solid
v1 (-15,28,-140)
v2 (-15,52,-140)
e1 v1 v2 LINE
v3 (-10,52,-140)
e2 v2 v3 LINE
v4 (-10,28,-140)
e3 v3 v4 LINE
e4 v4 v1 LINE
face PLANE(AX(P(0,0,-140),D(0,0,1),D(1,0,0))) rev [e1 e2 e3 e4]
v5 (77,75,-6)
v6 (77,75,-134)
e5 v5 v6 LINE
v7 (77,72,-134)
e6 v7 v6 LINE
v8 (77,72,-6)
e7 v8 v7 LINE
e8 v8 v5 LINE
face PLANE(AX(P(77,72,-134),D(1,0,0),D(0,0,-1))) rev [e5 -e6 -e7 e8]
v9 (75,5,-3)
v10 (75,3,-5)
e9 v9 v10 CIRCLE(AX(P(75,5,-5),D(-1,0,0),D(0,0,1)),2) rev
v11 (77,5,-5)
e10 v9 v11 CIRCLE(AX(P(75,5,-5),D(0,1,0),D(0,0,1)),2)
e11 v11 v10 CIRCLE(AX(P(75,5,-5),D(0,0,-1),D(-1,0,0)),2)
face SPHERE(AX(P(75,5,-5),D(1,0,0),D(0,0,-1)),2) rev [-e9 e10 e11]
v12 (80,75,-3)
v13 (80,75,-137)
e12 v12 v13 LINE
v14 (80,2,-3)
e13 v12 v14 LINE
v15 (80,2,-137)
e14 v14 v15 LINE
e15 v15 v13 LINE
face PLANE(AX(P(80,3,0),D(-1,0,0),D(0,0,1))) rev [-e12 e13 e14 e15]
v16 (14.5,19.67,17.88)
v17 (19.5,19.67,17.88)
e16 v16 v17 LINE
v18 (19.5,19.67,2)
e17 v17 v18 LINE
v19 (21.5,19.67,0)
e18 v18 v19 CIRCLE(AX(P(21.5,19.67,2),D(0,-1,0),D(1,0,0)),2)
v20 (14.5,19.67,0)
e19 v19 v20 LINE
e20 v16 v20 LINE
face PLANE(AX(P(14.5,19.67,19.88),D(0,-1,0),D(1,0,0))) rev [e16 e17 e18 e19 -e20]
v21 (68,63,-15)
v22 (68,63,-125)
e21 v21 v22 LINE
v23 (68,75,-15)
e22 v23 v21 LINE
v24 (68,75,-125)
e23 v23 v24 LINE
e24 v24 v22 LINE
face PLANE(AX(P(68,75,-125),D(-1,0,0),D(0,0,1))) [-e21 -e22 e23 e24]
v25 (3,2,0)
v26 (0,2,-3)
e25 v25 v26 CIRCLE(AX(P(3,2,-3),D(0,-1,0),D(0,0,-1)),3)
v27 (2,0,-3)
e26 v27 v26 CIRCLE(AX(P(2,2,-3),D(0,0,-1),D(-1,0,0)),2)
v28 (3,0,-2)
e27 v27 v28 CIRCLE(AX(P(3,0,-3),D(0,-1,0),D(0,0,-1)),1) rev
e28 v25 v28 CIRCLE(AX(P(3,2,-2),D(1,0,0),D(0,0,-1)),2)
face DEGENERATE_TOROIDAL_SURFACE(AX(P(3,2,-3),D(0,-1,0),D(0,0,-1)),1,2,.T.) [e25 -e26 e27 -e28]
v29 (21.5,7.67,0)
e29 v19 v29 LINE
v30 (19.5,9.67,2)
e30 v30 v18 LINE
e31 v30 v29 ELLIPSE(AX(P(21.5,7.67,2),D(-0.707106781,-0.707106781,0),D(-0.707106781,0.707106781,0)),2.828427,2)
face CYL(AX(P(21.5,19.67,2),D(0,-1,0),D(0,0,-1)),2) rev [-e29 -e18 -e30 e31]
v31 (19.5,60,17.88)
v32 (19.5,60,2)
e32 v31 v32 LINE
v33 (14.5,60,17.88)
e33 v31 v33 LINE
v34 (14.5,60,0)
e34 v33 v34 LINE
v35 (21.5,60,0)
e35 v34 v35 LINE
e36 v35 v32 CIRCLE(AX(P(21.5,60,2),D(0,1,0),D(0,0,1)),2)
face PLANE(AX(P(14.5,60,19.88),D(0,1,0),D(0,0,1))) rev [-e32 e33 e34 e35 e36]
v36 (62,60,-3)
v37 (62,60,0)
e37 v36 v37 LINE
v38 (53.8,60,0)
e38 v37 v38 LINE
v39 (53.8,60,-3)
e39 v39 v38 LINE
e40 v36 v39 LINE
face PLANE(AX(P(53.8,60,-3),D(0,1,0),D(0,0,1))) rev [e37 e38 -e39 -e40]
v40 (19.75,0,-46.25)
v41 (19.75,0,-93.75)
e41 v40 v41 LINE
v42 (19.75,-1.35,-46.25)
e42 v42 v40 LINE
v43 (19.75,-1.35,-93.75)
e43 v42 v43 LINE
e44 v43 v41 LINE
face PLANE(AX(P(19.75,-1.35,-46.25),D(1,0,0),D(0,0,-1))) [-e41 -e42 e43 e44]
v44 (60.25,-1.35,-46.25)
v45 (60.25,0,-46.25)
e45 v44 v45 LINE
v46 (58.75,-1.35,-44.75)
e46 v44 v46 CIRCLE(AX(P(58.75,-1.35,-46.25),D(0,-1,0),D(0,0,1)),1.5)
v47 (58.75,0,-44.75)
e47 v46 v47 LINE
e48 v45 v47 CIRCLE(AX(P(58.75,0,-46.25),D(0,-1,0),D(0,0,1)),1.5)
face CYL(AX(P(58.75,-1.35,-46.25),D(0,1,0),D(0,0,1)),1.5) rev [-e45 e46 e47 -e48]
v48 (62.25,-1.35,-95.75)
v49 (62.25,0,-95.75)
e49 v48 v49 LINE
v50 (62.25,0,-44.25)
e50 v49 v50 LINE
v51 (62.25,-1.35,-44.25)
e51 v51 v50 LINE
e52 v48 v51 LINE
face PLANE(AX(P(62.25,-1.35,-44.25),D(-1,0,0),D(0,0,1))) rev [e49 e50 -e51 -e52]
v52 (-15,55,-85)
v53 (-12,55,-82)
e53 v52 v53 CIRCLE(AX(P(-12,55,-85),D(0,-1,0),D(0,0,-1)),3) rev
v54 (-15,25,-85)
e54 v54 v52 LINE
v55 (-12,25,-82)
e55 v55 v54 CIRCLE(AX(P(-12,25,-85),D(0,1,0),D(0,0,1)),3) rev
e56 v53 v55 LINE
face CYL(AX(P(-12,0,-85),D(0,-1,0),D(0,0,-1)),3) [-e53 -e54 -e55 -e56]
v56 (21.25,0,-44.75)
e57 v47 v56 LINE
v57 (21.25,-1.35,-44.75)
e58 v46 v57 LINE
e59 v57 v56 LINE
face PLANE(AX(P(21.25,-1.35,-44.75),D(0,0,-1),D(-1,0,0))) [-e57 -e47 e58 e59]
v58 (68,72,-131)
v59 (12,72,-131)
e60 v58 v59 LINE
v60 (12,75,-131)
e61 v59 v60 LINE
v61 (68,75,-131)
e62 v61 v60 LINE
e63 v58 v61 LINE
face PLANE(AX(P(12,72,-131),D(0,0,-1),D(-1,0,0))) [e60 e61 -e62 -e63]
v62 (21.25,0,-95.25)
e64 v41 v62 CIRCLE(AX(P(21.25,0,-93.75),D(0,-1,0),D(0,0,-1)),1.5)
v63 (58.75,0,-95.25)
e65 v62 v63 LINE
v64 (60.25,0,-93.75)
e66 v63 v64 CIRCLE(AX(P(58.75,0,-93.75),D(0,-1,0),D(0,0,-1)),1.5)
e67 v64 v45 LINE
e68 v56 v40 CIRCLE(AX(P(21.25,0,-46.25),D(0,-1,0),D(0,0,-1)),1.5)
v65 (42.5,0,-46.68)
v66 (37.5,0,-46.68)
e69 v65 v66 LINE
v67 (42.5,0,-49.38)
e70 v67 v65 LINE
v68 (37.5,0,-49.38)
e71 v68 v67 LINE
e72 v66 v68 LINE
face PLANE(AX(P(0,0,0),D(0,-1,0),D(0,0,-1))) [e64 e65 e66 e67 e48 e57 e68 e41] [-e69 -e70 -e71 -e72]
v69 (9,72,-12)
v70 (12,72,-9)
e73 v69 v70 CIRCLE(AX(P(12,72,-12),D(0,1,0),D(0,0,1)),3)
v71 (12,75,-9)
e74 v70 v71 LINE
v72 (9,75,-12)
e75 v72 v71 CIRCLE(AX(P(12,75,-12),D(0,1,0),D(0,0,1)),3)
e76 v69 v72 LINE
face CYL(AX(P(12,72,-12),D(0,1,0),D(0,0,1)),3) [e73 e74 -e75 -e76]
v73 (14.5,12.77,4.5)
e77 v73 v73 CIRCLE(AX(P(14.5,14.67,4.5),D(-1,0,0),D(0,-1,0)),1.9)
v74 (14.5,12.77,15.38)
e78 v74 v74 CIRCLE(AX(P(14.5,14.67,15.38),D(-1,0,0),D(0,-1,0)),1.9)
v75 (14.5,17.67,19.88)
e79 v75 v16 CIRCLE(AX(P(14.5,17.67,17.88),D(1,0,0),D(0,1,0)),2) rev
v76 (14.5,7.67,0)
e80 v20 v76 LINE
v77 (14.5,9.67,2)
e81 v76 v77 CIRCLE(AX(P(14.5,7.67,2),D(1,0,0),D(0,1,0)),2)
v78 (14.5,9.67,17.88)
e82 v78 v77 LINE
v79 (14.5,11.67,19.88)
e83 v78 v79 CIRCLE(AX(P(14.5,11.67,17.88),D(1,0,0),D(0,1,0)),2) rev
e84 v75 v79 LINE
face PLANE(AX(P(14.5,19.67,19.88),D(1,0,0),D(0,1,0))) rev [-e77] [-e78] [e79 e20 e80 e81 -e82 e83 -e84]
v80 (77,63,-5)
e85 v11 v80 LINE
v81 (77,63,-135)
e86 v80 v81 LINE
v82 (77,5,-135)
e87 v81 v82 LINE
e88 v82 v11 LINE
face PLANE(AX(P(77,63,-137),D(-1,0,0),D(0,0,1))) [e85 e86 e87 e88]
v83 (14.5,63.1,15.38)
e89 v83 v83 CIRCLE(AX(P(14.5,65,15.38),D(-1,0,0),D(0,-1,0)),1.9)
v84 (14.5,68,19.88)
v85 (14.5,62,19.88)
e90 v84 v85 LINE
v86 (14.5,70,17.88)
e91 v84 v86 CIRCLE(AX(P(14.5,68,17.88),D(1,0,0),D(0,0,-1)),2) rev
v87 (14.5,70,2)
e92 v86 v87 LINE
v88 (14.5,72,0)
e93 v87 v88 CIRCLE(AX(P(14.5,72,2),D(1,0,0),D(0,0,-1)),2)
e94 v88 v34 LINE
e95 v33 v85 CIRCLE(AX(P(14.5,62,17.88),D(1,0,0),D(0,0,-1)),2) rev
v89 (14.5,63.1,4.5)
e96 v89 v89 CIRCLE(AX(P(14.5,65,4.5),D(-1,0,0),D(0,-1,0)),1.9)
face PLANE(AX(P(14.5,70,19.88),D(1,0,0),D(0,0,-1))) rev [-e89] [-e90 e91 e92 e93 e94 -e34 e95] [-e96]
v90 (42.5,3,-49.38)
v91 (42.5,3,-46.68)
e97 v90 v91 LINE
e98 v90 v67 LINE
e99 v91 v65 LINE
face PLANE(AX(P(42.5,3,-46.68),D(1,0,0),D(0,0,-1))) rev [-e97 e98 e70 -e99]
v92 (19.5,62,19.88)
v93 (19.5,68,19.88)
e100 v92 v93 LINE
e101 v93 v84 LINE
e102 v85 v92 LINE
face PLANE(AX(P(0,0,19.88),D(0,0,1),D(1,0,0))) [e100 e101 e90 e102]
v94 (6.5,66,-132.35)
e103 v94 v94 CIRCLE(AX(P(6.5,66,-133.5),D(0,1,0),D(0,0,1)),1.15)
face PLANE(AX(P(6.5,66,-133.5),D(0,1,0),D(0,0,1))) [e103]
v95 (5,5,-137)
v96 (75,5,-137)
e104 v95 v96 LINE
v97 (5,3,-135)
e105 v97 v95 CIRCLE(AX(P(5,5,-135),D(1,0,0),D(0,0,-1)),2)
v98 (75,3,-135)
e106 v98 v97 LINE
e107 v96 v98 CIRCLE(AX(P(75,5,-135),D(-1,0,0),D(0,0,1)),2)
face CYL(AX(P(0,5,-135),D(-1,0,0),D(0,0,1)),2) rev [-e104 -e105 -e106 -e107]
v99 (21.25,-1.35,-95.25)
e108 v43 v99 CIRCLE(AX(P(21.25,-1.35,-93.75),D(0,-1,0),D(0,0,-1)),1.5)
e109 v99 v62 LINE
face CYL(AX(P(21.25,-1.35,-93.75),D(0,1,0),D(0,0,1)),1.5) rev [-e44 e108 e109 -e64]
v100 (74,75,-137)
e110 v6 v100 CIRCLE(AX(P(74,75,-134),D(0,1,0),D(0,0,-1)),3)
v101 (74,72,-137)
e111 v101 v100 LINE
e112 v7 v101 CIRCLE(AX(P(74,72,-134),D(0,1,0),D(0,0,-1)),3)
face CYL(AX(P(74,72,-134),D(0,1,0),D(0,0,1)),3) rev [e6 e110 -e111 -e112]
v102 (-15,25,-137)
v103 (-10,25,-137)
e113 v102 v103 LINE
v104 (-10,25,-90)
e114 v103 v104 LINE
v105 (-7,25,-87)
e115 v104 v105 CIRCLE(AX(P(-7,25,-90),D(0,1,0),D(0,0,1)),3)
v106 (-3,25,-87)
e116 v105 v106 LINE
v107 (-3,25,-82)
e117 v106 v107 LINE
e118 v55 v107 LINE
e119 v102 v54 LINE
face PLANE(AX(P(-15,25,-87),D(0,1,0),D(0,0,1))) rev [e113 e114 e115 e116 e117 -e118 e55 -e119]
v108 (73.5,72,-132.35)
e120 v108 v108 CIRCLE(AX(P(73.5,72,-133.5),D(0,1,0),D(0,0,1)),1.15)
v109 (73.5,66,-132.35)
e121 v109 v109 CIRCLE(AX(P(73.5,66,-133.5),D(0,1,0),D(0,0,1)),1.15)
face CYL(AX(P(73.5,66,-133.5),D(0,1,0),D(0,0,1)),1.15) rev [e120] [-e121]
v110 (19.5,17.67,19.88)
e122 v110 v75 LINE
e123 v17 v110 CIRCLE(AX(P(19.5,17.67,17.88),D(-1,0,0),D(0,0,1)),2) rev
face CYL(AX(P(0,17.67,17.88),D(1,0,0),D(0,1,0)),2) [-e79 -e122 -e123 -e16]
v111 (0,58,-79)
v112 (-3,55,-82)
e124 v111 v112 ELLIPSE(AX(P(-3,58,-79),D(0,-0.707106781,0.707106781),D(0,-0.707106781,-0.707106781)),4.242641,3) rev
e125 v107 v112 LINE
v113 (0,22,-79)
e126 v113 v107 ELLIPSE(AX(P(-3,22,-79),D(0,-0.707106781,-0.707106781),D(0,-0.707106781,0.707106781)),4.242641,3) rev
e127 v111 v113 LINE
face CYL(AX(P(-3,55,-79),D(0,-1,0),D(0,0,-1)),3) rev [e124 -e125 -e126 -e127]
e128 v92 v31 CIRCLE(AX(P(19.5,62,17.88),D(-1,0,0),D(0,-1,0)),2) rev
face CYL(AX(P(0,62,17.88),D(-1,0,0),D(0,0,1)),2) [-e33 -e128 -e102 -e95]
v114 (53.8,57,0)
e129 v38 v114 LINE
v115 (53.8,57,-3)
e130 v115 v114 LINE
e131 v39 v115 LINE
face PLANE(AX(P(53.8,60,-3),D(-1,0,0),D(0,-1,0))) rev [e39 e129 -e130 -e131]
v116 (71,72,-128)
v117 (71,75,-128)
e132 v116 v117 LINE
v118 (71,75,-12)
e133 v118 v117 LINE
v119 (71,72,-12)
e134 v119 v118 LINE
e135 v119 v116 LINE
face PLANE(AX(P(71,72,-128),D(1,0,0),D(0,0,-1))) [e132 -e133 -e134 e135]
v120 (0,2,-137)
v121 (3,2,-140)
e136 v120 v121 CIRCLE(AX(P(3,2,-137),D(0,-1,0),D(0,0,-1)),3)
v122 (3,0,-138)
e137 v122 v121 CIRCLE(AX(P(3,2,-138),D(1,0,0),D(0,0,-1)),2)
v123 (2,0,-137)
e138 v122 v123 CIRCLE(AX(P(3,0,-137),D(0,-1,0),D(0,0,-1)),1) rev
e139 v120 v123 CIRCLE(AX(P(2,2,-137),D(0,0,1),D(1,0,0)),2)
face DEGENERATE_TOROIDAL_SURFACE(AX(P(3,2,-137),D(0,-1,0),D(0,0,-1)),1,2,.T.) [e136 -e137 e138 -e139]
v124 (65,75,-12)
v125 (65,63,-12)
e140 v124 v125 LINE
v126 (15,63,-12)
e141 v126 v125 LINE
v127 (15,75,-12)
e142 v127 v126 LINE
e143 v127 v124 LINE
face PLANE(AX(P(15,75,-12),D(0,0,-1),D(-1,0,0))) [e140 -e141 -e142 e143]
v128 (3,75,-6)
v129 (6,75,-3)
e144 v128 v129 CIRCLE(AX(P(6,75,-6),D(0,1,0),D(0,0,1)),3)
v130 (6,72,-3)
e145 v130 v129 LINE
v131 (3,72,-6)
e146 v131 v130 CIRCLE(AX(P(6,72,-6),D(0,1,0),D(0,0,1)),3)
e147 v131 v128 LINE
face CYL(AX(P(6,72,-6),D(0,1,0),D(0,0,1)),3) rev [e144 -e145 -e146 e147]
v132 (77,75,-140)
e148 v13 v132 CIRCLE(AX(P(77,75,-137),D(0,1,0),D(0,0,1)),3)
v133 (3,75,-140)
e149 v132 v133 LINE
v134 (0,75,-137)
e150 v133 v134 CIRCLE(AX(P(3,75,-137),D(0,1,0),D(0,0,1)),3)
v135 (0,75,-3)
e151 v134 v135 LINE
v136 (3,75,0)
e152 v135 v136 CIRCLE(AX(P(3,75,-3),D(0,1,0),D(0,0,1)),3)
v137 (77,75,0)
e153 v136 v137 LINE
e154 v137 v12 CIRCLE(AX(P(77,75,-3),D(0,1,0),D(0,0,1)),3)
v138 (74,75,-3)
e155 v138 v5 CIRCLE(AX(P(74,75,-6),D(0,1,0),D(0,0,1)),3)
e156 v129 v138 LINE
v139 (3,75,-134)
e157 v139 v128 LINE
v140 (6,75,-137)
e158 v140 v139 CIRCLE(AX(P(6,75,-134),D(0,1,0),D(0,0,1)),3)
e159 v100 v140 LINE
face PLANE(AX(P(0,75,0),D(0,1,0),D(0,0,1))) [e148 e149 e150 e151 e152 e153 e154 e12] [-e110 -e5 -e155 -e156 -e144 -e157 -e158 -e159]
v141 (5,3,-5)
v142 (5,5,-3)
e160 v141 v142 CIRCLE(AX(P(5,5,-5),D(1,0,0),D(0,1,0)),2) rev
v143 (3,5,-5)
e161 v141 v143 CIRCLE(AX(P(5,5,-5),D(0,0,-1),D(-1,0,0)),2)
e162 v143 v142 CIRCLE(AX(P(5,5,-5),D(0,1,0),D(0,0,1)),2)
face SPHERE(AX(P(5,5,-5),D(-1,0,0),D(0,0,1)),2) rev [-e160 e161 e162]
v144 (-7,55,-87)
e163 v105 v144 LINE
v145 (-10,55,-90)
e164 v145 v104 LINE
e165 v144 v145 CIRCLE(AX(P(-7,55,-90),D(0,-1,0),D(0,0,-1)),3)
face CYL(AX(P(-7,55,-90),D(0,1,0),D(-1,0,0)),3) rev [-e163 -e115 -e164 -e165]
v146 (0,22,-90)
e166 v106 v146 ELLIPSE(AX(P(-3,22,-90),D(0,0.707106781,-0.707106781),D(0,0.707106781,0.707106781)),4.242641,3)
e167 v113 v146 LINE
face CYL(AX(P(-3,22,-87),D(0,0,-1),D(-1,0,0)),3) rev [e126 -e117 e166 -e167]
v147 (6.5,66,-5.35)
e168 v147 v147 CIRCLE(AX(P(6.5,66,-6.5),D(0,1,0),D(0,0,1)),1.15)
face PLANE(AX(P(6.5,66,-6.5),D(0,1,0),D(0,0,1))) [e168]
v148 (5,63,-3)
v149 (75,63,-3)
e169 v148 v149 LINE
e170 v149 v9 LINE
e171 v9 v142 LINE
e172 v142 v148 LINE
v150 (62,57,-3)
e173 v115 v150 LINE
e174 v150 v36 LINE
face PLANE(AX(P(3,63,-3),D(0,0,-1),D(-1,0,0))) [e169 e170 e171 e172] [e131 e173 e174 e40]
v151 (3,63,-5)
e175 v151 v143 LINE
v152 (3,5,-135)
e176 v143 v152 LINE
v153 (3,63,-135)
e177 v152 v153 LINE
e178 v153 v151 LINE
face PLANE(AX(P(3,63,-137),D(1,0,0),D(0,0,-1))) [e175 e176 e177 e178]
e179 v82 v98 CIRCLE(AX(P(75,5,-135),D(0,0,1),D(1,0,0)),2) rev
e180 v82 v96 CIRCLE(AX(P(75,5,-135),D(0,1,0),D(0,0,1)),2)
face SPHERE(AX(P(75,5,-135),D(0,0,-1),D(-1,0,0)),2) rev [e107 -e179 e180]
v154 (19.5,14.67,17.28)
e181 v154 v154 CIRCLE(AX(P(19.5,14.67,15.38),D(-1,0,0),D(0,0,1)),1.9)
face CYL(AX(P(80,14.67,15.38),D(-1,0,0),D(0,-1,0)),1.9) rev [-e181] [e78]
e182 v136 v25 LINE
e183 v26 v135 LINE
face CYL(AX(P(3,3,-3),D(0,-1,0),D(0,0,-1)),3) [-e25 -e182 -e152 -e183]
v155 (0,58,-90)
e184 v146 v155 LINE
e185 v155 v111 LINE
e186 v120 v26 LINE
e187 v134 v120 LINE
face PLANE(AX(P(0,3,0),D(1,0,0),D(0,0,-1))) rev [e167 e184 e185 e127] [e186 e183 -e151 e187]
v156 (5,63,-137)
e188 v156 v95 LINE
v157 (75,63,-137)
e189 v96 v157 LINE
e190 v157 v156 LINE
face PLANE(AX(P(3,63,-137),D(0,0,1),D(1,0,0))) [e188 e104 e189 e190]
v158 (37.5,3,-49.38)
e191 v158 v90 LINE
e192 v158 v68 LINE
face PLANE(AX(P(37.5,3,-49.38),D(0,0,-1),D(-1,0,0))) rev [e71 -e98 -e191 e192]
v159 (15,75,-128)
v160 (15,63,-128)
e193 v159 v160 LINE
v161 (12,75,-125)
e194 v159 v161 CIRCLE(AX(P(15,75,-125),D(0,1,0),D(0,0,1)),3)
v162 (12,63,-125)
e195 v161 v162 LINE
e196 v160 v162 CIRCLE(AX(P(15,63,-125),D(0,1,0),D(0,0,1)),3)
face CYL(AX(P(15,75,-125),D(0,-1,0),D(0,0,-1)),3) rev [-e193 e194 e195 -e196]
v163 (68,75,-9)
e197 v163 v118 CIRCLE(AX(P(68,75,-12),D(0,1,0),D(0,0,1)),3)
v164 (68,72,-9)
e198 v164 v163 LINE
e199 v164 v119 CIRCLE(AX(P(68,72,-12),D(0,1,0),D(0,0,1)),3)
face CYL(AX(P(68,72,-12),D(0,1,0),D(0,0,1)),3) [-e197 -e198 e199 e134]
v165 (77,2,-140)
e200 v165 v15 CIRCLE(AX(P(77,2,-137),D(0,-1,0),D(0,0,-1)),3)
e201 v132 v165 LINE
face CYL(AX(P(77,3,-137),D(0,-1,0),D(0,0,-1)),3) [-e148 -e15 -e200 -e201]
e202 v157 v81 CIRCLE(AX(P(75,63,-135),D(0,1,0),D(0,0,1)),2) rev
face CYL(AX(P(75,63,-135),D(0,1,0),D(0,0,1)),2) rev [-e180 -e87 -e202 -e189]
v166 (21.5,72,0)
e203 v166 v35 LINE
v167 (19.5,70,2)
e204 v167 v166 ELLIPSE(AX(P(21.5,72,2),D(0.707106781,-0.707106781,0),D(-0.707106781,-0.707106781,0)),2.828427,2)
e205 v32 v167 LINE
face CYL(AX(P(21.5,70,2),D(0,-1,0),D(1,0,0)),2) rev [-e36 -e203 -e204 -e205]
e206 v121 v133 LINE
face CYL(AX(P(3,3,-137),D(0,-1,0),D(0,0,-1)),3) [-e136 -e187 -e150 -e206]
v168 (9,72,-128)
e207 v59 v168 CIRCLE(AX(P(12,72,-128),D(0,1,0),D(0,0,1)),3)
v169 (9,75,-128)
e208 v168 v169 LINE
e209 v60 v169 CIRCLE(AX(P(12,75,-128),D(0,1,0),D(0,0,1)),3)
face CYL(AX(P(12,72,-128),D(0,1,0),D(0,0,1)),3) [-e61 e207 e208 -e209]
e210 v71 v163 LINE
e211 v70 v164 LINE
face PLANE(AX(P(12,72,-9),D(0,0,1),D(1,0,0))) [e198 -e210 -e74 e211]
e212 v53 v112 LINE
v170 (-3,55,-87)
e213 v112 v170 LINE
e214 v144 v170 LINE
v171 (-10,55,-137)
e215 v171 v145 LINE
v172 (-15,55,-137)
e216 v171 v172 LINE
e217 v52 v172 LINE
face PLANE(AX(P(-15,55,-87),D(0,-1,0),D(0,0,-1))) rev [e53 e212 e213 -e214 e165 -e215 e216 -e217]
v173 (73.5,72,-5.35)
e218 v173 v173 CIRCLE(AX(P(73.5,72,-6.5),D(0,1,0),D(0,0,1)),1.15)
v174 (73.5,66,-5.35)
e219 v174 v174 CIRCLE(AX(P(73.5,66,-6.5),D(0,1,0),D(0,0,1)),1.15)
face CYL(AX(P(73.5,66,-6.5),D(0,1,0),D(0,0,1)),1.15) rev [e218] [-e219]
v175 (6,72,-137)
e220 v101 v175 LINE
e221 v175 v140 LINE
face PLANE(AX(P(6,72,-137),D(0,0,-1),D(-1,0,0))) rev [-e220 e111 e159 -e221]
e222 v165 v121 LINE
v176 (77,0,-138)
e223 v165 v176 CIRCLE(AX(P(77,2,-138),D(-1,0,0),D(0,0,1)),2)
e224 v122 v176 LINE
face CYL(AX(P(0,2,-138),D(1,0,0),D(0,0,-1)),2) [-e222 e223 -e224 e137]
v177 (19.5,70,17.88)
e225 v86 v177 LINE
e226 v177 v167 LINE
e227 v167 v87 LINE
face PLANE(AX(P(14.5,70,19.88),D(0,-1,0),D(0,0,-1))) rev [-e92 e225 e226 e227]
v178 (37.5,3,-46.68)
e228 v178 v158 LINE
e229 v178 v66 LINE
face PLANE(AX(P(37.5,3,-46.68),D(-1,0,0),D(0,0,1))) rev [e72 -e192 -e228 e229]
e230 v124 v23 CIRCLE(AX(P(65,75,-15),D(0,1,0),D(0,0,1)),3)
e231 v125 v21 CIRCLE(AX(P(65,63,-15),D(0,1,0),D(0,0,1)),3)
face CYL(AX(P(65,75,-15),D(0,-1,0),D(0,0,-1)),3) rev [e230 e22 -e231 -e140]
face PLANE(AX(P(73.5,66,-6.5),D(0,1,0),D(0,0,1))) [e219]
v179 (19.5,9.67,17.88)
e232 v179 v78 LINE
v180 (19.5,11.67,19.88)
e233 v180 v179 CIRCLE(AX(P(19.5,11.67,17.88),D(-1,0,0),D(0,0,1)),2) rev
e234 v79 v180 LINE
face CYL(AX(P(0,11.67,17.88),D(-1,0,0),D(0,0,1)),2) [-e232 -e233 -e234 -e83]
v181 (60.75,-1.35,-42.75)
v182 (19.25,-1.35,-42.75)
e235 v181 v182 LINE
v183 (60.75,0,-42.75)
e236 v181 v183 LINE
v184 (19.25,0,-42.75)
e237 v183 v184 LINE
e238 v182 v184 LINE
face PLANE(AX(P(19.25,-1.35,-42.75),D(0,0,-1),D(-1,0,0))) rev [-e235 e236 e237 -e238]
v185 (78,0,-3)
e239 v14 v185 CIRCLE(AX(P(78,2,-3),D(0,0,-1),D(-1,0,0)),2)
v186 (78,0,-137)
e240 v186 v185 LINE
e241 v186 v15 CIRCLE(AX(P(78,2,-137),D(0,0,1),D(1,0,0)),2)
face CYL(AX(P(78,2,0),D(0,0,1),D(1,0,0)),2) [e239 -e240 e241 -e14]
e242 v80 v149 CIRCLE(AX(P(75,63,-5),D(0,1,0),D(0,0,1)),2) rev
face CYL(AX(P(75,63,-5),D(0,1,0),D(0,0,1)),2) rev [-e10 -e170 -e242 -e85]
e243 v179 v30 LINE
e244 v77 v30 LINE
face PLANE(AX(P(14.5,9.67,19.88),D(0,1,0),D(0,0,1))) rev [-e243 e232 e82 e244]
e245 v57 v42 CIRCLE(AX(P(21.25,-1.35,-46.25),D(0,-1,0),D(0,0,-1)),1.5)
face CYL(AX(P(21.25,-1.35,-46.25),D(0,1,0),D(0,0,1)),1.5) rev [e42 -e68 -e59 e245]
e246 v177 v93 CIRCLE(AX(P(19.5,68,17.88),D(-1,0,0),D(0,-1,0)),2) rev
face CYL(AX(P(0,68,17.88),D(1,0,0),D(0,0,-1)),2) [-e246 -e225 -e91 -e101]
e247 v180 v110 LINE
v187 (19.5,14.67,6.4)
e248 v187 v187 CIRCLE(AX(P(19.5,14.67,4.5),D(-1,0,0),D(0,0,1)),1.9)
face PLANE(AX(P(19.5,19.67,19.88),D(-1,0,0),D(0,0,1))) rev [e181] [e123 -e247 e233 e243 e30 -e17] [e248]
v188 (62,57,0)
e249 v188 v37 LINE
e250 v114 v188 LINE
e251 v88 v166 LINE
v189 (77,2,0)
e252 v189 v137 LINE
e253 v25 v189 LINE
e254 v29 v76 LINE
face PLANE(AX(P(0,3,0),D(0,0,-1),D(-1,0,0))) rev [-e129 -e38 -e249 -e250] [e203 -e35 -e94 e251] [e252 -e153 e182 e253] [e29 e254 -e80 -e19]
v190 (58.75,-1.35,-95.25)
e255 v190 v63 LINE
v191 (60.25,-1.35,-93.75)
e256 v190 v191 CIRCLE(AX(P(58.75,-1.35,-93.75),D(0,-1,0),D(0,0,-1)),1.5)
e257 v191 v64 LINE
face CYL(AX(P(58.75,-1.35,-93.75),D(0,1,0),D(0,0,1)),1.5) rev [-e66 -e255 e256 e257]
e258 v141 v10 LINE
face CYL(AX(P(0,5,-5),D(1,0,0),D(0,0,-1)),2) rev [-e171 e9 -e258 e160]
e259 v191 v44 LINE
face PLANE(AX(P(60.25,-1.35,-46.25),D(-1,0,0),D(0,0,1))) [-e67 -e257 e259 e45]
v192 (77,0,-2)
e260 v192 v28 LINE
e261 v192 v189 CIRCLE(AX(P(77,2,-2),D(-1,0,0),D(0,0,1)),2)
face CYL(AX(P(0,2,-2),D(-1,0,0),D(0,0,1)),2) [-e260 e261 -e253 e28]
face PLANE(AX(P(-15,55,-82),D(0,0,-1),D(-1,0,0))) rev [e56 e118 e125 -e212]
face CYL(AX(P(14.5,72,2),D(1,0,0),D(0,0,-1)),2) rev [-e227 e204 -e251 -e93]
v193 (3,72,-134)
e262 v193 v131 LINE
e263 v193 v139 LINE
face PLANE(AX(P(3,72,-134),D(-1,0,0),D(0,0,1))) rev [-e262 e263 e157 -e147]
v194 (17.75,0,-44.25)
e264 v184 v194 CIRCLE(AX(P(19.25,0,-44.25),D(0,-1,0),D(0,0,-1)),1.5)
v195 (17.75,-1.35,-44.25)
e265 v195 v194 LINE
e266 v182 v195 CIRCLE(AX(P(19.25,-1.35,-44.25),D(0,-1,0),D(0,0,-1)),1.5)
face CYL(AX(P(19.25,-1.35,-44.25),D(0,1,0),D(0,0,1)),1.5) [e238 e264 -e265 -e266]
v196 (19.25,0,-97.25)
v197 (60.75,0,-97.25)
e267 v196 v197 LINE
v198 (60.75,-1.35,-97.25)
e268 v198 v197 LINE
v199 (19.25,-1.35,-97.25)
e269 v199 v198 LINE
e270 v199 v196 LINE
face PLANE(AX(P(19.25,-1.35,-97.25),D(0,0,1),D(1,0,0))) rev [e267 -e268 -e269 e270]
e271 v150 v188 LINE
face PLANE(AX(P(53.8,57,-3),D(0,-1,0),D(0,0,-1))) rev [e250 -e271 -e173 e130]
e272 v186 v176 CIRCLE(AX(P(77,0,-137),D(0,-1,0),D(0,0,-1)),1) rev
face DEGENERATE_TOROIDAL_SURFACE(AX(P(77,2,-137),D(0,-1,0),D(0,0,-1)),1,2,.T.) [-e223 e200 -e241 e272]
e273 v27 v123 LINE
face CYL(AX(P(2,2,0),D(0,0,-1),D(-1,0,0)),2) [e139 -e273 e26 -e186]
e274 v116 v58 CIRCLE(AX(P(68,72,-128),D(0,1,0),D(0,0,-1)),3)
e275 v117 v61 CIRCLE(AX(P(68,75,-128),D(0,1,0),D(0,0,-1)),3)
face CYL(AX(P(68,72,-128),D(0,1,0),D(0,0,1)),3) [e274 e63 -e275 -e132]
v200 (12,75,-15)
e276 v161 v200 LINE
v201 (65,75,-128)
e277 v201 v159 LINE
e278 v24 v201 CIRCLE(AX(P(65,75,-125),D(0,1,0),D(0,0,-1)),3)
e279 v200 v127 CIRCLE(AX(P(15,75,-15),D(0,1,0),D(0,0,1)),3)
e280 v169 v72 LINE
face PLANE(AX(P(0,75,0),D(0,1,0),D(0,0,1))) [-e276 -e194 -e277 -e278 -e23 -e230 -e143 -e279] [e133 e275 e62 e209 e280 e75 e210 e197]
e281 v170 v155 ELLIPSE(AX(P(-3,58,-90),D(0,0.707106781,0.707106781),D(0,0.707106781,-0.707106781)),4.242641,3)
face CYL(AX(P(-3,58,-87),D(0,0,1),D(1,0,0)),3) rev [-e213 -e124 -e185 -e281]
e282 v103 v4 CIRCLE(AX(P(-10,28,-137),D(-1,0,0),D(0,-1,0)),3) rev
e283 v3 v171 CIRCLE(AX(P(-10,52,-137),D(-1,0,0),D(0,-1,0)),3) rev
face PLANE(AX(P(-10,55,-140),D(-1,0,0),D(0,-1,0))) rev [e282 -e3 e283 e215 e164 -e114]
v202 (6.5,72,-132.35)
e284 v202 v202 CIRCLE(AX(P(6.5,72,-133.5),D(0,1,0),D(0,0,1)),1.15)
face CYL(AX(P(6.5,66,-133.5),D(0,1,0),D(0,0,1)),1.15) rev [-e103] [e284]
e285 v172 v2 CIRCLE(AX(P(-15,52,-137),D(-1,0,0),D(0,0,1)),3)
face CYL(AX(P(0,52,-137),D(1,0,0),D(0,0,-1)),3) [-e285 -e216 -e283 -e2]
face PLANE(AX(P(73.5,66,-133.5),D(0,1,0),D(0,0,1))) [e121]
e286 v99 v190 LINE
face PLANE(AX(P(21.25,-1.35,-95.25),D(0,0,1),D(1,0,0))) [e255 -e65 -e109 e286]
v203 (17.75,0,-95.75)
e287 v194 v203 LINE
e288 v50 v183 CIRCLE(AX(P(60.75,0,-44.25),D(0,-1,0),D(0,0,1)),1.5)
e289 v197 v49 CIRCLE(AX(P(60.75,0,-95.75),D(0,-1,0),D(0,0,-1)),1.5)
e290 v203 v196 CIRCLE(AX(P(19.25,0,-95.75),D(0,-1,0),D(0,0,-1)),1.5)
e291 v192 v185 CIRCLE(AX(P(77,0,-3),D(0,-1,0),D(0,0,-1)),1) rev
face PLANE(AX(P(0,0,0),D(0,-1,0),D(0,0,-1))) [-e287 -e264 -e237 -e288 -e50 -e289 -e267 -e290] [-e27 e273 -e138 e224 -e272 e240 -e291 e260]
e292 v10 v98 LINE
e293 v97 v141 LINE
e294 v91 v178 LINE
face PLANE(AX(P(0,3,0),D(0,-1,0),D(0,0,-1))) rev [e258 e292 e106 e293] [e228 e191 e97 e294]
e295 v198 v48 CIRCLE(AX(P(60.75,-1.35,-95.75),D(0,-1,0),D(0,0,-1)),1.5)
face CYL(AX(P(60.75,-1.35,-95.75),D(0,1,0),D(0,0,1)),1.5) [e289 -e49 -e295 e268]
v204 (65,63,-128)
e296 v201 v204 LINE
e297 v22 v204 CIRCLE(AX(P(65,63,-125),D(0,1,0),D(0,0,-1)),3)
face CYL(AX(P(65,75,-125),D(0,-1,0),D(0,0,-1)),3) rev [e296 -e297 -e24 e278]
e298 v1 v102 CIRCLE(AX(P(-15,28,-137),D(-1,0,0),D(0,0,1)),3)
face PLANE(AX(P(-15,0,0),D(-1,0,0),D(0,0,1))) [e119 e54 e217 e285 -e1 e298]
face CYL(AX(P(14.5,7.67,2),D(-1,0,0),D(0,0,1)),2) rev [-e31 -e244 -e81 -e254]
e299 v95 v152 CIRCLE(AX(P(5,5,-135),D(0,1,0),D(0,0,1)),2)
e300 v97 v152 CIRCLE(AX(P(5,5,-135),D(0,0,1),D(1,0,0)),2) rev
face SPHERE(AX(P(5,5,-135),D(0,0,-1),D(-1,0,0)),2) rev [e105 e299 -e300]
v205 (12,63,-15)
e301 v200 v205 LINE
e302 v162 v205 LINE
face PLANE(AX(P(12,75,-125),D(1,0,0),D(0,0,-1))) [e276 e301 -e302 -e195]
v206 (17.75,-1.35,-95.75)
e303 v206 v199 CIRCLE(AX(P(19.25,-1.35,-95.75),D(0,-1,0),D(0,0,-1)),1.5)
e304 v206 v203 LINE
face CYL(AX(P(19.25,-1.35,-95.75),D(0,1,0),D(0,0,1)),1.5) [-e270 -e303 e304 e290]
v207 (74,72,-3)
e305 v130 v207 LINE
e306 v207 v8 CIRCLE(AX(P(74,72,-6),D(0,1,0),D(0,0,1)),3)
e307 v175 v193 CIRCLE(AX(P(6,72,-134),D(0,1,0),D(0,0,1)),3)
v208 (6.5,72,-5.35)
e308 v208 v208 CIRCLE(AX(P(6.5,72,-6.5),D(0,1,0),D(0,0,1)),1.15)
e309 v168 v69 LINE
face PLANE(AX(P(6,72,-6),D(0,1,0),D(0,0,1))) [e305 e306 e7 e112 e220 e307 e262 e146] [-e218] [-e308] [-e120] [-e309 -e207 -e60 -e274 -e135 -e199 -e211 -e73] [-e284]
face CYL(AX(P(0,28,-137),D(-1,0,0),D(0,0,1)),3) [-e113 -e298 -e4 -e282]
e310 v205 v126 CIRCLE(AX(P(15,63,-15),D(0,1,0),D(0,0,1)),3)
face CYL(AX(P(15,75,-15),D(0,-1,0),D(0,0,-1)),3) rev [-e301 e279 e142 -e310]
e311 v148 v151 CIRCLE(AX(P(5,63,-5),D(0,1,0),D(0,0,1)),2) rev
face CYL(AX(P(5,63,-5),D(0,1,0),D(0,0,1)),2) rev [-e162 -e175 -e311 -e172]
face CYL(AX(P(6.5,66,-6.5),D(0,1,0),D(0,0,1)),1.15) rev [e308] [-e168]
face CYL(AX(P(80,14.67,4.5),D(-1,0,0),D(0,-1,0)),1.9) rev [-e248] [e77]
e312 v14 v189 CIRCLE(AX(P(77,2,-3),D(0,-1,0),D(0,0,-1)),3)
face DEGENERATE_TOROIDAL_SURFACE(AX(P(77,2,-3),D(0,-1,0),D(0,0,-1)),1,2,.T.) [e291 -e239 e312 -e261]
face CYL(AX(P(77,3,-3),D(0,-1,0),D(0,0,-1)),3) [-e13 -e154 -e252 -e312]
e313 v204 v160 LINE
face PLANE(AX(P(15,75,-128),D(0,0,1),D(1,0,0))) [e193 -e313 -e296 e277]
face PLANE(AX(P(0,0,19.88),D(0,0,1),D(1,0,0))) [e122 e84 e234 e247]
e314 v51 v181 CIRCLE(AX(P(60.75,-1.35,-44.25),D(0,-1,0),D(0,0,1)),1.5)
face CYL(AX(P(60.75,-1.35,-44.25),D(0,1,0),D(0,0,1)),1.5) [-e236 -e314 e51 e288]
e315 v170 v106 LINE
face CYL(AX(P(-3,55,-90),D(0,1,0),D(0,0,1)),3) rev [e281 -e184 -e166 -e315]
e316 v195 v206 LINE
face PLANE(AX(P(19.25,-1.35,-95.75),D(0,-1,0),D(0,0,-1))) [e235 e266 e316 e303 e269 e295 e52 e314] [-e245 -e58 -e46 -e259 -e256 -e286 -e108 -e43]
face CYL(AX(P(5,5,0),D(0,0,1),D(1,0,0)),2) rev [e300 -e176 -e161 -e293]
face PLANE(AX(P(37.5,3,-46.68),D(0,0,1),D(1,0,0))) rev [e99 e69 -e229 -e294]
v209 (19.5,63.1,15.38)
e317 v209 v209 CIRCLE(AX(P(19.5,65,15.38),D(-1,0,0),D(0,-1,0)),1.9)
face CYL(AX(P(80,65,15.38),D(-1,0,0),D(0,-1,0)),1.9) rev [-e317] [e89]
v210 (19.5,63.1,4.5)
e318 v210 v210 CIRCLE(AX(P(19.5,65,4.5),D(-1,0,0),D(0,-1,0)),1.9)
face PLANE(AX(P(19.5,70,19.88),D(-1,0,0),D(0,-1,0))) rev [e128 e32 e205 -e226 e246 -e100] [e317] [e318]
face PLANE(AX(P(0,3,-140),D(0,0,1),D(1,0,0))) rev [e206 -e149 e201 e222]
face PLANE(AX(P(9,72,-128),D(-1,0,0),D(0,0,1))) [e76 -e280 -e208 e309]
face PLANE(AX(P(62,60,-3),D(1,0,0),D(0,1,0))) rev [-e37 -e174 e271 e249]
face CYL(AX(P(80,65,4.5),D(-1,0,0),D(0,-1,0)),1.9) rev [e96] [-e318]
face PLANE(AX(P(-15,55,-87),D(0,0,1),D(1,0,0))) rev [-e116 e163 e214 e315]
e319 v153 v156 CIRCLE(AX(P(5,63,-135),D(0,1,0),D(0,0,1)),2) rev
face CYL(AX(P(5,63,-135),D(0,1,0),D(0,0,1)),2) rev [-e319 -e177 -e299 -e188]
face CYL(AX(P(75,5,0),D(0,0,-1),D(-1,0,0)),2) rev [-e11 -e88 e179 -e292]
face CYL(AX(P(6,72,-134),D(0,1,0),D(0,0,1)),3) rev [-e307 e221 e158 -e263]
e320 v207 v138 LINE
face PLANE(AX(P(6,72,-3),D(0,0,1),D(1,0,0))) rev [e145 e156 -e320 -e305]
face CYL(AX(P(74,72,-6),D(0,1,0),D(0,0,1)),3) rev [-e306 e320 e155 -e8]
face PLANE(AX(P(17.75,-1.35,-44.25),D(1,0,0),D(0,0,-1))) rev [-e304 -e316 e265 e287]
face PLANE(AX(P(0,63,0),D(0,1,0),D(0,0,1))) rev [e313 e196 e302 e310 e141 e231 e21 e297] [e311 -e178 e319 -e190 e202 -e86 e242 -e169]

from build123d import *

# Parameters (mm, degrees)
SKETCH1_W           = 80
SKETCH1_H           = 140
BOSS_EXTRUDE1_DEPTH = 3
SKETCH2_W           = 80
SKETCH2_H           = 140
SKETCH2_W_2         = 74
SKETCH2_H_2         = 134
BOSS_EXTRUDE2_DEPTH = 60
FILLET1_R           = 2
FILLET2_R           = 2
SKETCH6_W           = 80
SKETCH6_H           = 140
BOSS_EXTRUDE3_DEPTH = 12
CUT_EXTRUDE1_DEPTH  = 3
SKETCH8_R           = 1.15
CUT_EXTRUDE2_DEPTH  = 6
FILLET3_R           = 3
SKETCH9_W           = 5
SKETCH9_H           = 30
BOSS_EXTRUDE4_DEPTH = 15
SKETCH10_W          = 5
SKETCH10_H          = 30
BOSS_EXTRUDE5_DEPTH = 53
FILLET4_R           = 3
FILLET5_R           = 3
SKETCH12_W          = 5
SKETCH12_H          = 10
BOSS_EXTRUDE6_DEPTH = 19.88
FILLET6_R           = 2
FILLET7_R           = 2
SKETCH13_R          = 1.9
CUT_EXTRUDE3_DEPTH  = 172.800029104
SKETCH14_W          = 8.2
SKETCH14_H          = 3
CUT_EXTRUDE4_DEPTH  = 3
BOSS_EXTRUDE7_DEPTH = 1.35
SKETCH16_W          = 5
SKETCH16_H          = 2.7
CUT_EXTRUDE5_DEPTH  = 3


with BuildPart() as part:
    # Sketch1 → Boss-Extrude1 (new body)
    with BuildSketch(Plane(origin=(0, 0, 0), x_dir=(1, 0, 0), z_dir=(0, 1, 0))):
        with Locations((40, 70)):
            Rectangle(SKETCH1_W, SKETCH1_H)
    extrude(amount=BOSS_EXTRUDE1_DEPTH)

    # Sketch2 → Boss-Extrude2 (add)
    with BuildSketch(Plane(origin=(0, 3, 0), x_dir=(1, 0, 0), z_dir=(0, 1, 0))):
        with Locations((40, 70)):
            Rectangle(SKETCH2_W, SKETCH2_H)
        with Locations((40, 70)):
            Rectangle(SKETCH2_W_2, SKETCH2_H_2, mode=Mode.SUBTRACT)
    extrude(amount=BOSS_EXTRUDE2_DEPTH)

    # Fillet1
    fillet1_edges = [part.edges().sort_by_distance(p)[0] for p in [
        (3, 3, -70),
        (40, 3, -3),
        (77, 3, -70),
        (40, 3, -137),
        (3, 33, -3),
        (77, 33, -3),
        (77, 33, -137),
        (3, 33, -137),
    ]]
    fillet(fillet1_edges, radius=FILLET1_R)

    # Fillet2
    fillet2_edges = [part.edges().sort_by_distance(p)[0] for p in [
        (40, 0, -140),
        (80, 0, -70),
        (40, 0, 0),
        (0, 0, -70),
    ]]
    fillet(fillet2_edges, radius=FILLET2_R)

    # Sketch6 → Boss-Extrude3 (add)
    with BuildSketch(Plane(origin=(0, 63, 0), x_dir=(1, 0, 0), z_dir=(0, 1, 0))):
        with Locations((40, 70)):
            Rectangle(SKETCH6_W, SKETCH6_H)
        with BuildLine():
            Line((15, 128), (65, 128))
            ThreePointArc((65, 128), (67.121320344, 127.121320344), (68, 125))
            Line((68, 125), (68, 15))
            ThreePointArc((68, 15), (67.121320344, 12.878679656), (65, 12))
            Line((65, 12), (15, 12))
            ThreePointArc((15, 12), (12.878679656, 12.878679656), (12, 15))
            Line((12, 15), (12, 125))
            ThreePointArc((12, 125), (12.878679656, 127.121320344), (15, 128))
        make_face(mode=Mode.SUBTRACT)
    extrude(amount=BOSS_EXTRUDE3_DEPTH)

    # Sketch7 → Cut-Extrude1 (cut)
    with BuildSketch(Plane(origin=(0, 75, 0), x_dir=(1, 0, 0), z_dir=(0, 1, 0))):
        with BuildLine():
            Line((6, 137), (74, 137))
            ThreePointArc((74, 137), (76.121320344, 136.121320344), (77, 134))
            Line((77, 134), (77, 6))
            ThreePointArc((77, 6), (76.121320344, 3.878679656), (74, 3))
            Line((74, 3), (6, 3))
            ThreePointArc((6, 3), (3.878679656, 3.878679656), (3, 6))
            Line((3, 6), (3, 134))
            ThreePointArc((3, 134), (3.878679656, 136.121320344), (6, 137))
        make_face()
        with BuildLine():
            Line((12, 131), (68, 131))
            ThreePointArc((68, 131), (70.121320344, 130.121320344), (71, 128))
            Line((71, 128), (71, 12))
            ThreePointArc((71, 12), (70.121320344, 9.878679656), (68, 9))
            Line((68, 9), (12, 9))
            ThreePointArc((12, 9), (9.878679656, 9.878679656), (9, 12))
            Line((9, 12), (9, 128))
            ThreePointArc((9, 128), (9.878679656, 130.121320344), (12, 131))
        make_face(mode=Mode.SUBTRACT)
    extrude(amount=-CUT_EXTRUDE1_DEPTH, mode=Mode.SUBTRACT)

    # Sketch8 → Cut-Extrude2 (cut)
    with BuildSketch(Plane(origin=(0, 72, 0), x_dir=(1, 0, 0), z_dir=(0, 1, 0))):
        with Locations(Location((6.5, 6.5, 0), (0, 0, 270))):
            Circle(SKETCH8_R)
        with Locations(Location((73.5, 6.5, 0), (0, 0, 270))):
            Circle(SKETCH8_R)
        with Locations(Location((73.5, 133.5, 0), (0, 0, 270))):
            Circle(SKETCH8_R)
        with Locations(Location((6.5, 133.5, 0), (0, 0, 270))):
            Circle(SKETCH8_R)
    extrude(amount=-CUT_EXTRUDE2_DEPTH, mode=Mode.SUBTRACT)

    # Fillet3
    # the kernel refuses this fillet: 3 mm, written as the material it takes off along each edge
    with BuildSketch(Plane(origin=(77, 0, -3), x_dir=(1, 0, 0), z_dir=(0, 0, -1))) as fillet3_piece_1:
        with BuildLine():
            CenterArc((1, -2), 2, 0, 90)
            Line((3, -2), (3, 0))
            Line((3, 0), (1, 0))
        make_face()
    revolve(axis=Axis((77, 0, -3), (0, -1, 0)), revolution_arc=90, mode=Mode.SUBTRACT)
    with BuildSketch(Plane(origin=(3, 0, -3), x_dir=(0, 0, 1), z_dir=(1, 0, 0))) as fillet3_piece_2:
        with BuildLine():
            CenterArc((1, -2), 2, 0, 90)
            Line((3, -2), (3, 0))
            Line((3, 0), (1, 0))
        make_face()
    revolve(axis=Axis((3, 0, -3), (0, -1, 0)), revolution_arc=90, mode=Mode.SUBTRACT)
    with BuildSketch(Plane(origin=(77, 0, -137), x_dir=(0, 0, -1), z_dir=(-1, 0, 0))) as fillet3_piece_3:
        with BuildLine():
            CenterArc((1, -2), 2, 0, 90)
            Line((3, -2), (3, 0))
            Line((3, 0), (1, 0))
        make_face()
    revolve(axis=Axis((77, 0, -137), (0, -1, 0)), revolution_arc=90, mode=Mode.SUBTRACT)
    with BuildSketch(Plane(origin=(3, 0, -137), x_dir=(-1, 0, 0), z_dir=(0, 0, 1))) as fillet3_piece_4:
        with BuildLine():
            CenterArc((1, -2), 2, 0, 90)
            Line((3, -2), (3, 0))
            Line((3, 0), (1, 0))
        make_face()
    revolve(axis=Axis((3, 0, -137), (0, -1, 0)), revolution_arc=90, mode=Mode.SUBTRACT)
    with BuildSketch(Plane(origin=(0, 0, -140), x_dir=(1, 0, 0), z_dir=(0, 1, 0)), Plane(origin=(80, 82.5, -140), x_dir=(-1, 0, 0), z_dir=(0, -1, 0)), Plane(origin=(80, 82.5, 0), x_dir=(0, 0, -1), z_dir=(0, -1, 0)), Plane(origin=(0, 0, 0), x_dir=(0, 0, -1), z_dir=(0, 1, 0))) as fillet3_piece_5:
        with BuildLine():
            CenterArc((FILLET3_R, -FILLET3_R), FILLET3_R, 90, 90)
            Line((0, -FILLET3_R), (0, 0))
            Line((0, 0), (FILLET3_R, 0))
        make_face()
    extrude(amount=82.5, mode=Mode.SUBTRACT)

    # Sketch9 → Boss-Extrude4 (add)
    with BuildSketch(Plane.ZY):
        with Locations((-84.5, 40)):
            Rectangle(SKETCH9_W, SKETCH9_H)
    extrude(amount=BOSS_EXTRUDE4_DEPTH)

    # Sketch10 → Boss-Extrude5 (add)
    with BuildSketch(Plane(origin=(0, 0, -87), x_dir=(-1, 0, 0), z_dir=(0, 0, -1))):
        with Locations((12.5, 40)):
            Rectangle(SKETCH10_W, SKETCH10_H)
    extrude(amount=BOSS_EXTRUDE5_DEPTH)

    # Fillet4
    fillet4_edges = [part.edges().sort_by_distance(p)[0] for p in [
        (0, 40, -87),
        (0, 25, -84.5),
        (0, 40, -82),
        (0, 55, -84.5),
    ]]
    fillet(fillet4_edges, radius=FILLET4_R)

    # Fillet5
    fillet5_edges = [part.edges().sort_by_distance(p)[0] for p in [
        (-15, 40, -82),
        (-10, 40, -87),
        (-12.5, 55, -140),
        (-12.5, 25, -140),
    ]]
    fillet(fillet5_edges, radius=FILLET5_R)

    # Sketch12 → Boss-Extrude6 (add)
    with BuildSketch(Plane.XY):
        with Locations((17, 65)):
            Rectangle(SKETCH12_W, SKETCH12_H)
        with Locations((17, 14.67)):
            Rectangle(SKETCH12_W, SKETCH12_H)
    extrude(amount=BOSS_EXTRUDE6_DEPTH)

    # Fillet6
    fillet6_edges = [part.edges().sort_by_distance(p)[0] for p in [
        (19.5, 65, 0),
        (17, 70, 0),
        (17, 9.67, 0),
        (19.5, 14.67, 0),
    ]]
    fillet(fillet6_edges, radius=FILLET6_R)

    # Fillet7
    fillet7_edges = [part.edges().sort_by_distance(p)[0] for p in [
        (17, 60, 19.88),
        (17, 70, 19.88),
        (17, 9.67, 19.88),
        (17, 19.67, 19.88),
    ]]
    fillet(fillet7_edges, radius=FILLET7_R)

    # Sketch13 → Cut-Extrude3 (cut, through all)
    with BuildSketch(Plane.ZY.offset(-14.5)):
        with Locations(Location((4.5, 65, 0), (0, 0, 270))):
            Circle(SKETCH13_R)
        with Locations(Location((15.38, 65, 0), (0, 0, 270))):
            Circle(SKETCH13_R)
        with Locations(Location((4.5, 14.67, 0), (0, 0, 270))):
            Circle(SKETCH13_R)
        with Locations(Location((15.38, 14.67, 0), (0, 0, 270))):
            Circle(SKETCH13_R)
    extrude(amount=-CUT_EXTRUDE3_DEPTH, mode=Mode.SUBTRACT)

    # Sketch14 → Cut-Extrude4 (cut)
    with BuildSketch(Plane.XY):
        with Locations((57.9, 58.5)):
            Rectangle(SKETCH14_W, SKETCH14_H)
    extrude(amount=-CUT_EXTRUDE4_DEPTH, mode=Mode.SUBTRACT)

    # Sketch15 → Boss-Extrude7 (add)
    with BuildSketch(Plane.XZ):
        with BuildLine():
            Line((19.25, -42.75), (60.75, -42.75))
            ThreePointArc((60.75, -42.75), (61.810660172, -43.189339828), (62.25, -44.25))
            Line((62.25, -44.25), (62.25, -95.75))
            ThreePointArc((62.25, -95.75), (61.810660172, -96.810660172), (60.75, -97.25))
            Line((60.75, -97.25), (19.25, -97.25))
            ThreePointArc((19.25, -97.25), (18.189339828, -96.810660172), (17.75, -95.75))
            Line((17.75, -95.75), (17.75, -44.25))
            ThreePointArc((17.75, -44.25), (18.189339828, -43.189339828), (19.25, -42.75))
        make_face()
        with BuildLine():
            Line((21.25, -44.75), (58.75, -44.75))
            ThreePointArc((58.75, -44.75), (59.810660172, -45.189339828), (60.25, -46.25))
            Line((60.25, -46.25), (60.25, -93.75))
            ThreePointArc((60.25, -93.75), (59.810660172, -94.810660172), (58.75, -95.25))
            Line((58.75, -95.25), (21.25, -95.25))
            ThreePointArc((21.25, -95.25), (20.189339828, -94.810660172), (19.75, -93.75))
            Line((19.75, -93.75), (19.75, -46.25))
            ThreePointArc((19.75, -46.25), (20.189339828, -45.189339828), (21.25, -44.75))
        make_face(mode=Mode.SUBTRACT)
    extrude(amount=BOSS_EXTRUDE7_DEPTH)

    # Sketch16 → Cut-Extrude5 (cut)
    with BuildSketch(Plane.XZ):
        with Locations((40, -48.03)):
            Rectangle(SKETCH16_W, SKETCH16_H)
    extrude(amount=-CUT_EXTRUDE5_DEPTH, mode=Mode.SUBTRACT)


solid = part.part
